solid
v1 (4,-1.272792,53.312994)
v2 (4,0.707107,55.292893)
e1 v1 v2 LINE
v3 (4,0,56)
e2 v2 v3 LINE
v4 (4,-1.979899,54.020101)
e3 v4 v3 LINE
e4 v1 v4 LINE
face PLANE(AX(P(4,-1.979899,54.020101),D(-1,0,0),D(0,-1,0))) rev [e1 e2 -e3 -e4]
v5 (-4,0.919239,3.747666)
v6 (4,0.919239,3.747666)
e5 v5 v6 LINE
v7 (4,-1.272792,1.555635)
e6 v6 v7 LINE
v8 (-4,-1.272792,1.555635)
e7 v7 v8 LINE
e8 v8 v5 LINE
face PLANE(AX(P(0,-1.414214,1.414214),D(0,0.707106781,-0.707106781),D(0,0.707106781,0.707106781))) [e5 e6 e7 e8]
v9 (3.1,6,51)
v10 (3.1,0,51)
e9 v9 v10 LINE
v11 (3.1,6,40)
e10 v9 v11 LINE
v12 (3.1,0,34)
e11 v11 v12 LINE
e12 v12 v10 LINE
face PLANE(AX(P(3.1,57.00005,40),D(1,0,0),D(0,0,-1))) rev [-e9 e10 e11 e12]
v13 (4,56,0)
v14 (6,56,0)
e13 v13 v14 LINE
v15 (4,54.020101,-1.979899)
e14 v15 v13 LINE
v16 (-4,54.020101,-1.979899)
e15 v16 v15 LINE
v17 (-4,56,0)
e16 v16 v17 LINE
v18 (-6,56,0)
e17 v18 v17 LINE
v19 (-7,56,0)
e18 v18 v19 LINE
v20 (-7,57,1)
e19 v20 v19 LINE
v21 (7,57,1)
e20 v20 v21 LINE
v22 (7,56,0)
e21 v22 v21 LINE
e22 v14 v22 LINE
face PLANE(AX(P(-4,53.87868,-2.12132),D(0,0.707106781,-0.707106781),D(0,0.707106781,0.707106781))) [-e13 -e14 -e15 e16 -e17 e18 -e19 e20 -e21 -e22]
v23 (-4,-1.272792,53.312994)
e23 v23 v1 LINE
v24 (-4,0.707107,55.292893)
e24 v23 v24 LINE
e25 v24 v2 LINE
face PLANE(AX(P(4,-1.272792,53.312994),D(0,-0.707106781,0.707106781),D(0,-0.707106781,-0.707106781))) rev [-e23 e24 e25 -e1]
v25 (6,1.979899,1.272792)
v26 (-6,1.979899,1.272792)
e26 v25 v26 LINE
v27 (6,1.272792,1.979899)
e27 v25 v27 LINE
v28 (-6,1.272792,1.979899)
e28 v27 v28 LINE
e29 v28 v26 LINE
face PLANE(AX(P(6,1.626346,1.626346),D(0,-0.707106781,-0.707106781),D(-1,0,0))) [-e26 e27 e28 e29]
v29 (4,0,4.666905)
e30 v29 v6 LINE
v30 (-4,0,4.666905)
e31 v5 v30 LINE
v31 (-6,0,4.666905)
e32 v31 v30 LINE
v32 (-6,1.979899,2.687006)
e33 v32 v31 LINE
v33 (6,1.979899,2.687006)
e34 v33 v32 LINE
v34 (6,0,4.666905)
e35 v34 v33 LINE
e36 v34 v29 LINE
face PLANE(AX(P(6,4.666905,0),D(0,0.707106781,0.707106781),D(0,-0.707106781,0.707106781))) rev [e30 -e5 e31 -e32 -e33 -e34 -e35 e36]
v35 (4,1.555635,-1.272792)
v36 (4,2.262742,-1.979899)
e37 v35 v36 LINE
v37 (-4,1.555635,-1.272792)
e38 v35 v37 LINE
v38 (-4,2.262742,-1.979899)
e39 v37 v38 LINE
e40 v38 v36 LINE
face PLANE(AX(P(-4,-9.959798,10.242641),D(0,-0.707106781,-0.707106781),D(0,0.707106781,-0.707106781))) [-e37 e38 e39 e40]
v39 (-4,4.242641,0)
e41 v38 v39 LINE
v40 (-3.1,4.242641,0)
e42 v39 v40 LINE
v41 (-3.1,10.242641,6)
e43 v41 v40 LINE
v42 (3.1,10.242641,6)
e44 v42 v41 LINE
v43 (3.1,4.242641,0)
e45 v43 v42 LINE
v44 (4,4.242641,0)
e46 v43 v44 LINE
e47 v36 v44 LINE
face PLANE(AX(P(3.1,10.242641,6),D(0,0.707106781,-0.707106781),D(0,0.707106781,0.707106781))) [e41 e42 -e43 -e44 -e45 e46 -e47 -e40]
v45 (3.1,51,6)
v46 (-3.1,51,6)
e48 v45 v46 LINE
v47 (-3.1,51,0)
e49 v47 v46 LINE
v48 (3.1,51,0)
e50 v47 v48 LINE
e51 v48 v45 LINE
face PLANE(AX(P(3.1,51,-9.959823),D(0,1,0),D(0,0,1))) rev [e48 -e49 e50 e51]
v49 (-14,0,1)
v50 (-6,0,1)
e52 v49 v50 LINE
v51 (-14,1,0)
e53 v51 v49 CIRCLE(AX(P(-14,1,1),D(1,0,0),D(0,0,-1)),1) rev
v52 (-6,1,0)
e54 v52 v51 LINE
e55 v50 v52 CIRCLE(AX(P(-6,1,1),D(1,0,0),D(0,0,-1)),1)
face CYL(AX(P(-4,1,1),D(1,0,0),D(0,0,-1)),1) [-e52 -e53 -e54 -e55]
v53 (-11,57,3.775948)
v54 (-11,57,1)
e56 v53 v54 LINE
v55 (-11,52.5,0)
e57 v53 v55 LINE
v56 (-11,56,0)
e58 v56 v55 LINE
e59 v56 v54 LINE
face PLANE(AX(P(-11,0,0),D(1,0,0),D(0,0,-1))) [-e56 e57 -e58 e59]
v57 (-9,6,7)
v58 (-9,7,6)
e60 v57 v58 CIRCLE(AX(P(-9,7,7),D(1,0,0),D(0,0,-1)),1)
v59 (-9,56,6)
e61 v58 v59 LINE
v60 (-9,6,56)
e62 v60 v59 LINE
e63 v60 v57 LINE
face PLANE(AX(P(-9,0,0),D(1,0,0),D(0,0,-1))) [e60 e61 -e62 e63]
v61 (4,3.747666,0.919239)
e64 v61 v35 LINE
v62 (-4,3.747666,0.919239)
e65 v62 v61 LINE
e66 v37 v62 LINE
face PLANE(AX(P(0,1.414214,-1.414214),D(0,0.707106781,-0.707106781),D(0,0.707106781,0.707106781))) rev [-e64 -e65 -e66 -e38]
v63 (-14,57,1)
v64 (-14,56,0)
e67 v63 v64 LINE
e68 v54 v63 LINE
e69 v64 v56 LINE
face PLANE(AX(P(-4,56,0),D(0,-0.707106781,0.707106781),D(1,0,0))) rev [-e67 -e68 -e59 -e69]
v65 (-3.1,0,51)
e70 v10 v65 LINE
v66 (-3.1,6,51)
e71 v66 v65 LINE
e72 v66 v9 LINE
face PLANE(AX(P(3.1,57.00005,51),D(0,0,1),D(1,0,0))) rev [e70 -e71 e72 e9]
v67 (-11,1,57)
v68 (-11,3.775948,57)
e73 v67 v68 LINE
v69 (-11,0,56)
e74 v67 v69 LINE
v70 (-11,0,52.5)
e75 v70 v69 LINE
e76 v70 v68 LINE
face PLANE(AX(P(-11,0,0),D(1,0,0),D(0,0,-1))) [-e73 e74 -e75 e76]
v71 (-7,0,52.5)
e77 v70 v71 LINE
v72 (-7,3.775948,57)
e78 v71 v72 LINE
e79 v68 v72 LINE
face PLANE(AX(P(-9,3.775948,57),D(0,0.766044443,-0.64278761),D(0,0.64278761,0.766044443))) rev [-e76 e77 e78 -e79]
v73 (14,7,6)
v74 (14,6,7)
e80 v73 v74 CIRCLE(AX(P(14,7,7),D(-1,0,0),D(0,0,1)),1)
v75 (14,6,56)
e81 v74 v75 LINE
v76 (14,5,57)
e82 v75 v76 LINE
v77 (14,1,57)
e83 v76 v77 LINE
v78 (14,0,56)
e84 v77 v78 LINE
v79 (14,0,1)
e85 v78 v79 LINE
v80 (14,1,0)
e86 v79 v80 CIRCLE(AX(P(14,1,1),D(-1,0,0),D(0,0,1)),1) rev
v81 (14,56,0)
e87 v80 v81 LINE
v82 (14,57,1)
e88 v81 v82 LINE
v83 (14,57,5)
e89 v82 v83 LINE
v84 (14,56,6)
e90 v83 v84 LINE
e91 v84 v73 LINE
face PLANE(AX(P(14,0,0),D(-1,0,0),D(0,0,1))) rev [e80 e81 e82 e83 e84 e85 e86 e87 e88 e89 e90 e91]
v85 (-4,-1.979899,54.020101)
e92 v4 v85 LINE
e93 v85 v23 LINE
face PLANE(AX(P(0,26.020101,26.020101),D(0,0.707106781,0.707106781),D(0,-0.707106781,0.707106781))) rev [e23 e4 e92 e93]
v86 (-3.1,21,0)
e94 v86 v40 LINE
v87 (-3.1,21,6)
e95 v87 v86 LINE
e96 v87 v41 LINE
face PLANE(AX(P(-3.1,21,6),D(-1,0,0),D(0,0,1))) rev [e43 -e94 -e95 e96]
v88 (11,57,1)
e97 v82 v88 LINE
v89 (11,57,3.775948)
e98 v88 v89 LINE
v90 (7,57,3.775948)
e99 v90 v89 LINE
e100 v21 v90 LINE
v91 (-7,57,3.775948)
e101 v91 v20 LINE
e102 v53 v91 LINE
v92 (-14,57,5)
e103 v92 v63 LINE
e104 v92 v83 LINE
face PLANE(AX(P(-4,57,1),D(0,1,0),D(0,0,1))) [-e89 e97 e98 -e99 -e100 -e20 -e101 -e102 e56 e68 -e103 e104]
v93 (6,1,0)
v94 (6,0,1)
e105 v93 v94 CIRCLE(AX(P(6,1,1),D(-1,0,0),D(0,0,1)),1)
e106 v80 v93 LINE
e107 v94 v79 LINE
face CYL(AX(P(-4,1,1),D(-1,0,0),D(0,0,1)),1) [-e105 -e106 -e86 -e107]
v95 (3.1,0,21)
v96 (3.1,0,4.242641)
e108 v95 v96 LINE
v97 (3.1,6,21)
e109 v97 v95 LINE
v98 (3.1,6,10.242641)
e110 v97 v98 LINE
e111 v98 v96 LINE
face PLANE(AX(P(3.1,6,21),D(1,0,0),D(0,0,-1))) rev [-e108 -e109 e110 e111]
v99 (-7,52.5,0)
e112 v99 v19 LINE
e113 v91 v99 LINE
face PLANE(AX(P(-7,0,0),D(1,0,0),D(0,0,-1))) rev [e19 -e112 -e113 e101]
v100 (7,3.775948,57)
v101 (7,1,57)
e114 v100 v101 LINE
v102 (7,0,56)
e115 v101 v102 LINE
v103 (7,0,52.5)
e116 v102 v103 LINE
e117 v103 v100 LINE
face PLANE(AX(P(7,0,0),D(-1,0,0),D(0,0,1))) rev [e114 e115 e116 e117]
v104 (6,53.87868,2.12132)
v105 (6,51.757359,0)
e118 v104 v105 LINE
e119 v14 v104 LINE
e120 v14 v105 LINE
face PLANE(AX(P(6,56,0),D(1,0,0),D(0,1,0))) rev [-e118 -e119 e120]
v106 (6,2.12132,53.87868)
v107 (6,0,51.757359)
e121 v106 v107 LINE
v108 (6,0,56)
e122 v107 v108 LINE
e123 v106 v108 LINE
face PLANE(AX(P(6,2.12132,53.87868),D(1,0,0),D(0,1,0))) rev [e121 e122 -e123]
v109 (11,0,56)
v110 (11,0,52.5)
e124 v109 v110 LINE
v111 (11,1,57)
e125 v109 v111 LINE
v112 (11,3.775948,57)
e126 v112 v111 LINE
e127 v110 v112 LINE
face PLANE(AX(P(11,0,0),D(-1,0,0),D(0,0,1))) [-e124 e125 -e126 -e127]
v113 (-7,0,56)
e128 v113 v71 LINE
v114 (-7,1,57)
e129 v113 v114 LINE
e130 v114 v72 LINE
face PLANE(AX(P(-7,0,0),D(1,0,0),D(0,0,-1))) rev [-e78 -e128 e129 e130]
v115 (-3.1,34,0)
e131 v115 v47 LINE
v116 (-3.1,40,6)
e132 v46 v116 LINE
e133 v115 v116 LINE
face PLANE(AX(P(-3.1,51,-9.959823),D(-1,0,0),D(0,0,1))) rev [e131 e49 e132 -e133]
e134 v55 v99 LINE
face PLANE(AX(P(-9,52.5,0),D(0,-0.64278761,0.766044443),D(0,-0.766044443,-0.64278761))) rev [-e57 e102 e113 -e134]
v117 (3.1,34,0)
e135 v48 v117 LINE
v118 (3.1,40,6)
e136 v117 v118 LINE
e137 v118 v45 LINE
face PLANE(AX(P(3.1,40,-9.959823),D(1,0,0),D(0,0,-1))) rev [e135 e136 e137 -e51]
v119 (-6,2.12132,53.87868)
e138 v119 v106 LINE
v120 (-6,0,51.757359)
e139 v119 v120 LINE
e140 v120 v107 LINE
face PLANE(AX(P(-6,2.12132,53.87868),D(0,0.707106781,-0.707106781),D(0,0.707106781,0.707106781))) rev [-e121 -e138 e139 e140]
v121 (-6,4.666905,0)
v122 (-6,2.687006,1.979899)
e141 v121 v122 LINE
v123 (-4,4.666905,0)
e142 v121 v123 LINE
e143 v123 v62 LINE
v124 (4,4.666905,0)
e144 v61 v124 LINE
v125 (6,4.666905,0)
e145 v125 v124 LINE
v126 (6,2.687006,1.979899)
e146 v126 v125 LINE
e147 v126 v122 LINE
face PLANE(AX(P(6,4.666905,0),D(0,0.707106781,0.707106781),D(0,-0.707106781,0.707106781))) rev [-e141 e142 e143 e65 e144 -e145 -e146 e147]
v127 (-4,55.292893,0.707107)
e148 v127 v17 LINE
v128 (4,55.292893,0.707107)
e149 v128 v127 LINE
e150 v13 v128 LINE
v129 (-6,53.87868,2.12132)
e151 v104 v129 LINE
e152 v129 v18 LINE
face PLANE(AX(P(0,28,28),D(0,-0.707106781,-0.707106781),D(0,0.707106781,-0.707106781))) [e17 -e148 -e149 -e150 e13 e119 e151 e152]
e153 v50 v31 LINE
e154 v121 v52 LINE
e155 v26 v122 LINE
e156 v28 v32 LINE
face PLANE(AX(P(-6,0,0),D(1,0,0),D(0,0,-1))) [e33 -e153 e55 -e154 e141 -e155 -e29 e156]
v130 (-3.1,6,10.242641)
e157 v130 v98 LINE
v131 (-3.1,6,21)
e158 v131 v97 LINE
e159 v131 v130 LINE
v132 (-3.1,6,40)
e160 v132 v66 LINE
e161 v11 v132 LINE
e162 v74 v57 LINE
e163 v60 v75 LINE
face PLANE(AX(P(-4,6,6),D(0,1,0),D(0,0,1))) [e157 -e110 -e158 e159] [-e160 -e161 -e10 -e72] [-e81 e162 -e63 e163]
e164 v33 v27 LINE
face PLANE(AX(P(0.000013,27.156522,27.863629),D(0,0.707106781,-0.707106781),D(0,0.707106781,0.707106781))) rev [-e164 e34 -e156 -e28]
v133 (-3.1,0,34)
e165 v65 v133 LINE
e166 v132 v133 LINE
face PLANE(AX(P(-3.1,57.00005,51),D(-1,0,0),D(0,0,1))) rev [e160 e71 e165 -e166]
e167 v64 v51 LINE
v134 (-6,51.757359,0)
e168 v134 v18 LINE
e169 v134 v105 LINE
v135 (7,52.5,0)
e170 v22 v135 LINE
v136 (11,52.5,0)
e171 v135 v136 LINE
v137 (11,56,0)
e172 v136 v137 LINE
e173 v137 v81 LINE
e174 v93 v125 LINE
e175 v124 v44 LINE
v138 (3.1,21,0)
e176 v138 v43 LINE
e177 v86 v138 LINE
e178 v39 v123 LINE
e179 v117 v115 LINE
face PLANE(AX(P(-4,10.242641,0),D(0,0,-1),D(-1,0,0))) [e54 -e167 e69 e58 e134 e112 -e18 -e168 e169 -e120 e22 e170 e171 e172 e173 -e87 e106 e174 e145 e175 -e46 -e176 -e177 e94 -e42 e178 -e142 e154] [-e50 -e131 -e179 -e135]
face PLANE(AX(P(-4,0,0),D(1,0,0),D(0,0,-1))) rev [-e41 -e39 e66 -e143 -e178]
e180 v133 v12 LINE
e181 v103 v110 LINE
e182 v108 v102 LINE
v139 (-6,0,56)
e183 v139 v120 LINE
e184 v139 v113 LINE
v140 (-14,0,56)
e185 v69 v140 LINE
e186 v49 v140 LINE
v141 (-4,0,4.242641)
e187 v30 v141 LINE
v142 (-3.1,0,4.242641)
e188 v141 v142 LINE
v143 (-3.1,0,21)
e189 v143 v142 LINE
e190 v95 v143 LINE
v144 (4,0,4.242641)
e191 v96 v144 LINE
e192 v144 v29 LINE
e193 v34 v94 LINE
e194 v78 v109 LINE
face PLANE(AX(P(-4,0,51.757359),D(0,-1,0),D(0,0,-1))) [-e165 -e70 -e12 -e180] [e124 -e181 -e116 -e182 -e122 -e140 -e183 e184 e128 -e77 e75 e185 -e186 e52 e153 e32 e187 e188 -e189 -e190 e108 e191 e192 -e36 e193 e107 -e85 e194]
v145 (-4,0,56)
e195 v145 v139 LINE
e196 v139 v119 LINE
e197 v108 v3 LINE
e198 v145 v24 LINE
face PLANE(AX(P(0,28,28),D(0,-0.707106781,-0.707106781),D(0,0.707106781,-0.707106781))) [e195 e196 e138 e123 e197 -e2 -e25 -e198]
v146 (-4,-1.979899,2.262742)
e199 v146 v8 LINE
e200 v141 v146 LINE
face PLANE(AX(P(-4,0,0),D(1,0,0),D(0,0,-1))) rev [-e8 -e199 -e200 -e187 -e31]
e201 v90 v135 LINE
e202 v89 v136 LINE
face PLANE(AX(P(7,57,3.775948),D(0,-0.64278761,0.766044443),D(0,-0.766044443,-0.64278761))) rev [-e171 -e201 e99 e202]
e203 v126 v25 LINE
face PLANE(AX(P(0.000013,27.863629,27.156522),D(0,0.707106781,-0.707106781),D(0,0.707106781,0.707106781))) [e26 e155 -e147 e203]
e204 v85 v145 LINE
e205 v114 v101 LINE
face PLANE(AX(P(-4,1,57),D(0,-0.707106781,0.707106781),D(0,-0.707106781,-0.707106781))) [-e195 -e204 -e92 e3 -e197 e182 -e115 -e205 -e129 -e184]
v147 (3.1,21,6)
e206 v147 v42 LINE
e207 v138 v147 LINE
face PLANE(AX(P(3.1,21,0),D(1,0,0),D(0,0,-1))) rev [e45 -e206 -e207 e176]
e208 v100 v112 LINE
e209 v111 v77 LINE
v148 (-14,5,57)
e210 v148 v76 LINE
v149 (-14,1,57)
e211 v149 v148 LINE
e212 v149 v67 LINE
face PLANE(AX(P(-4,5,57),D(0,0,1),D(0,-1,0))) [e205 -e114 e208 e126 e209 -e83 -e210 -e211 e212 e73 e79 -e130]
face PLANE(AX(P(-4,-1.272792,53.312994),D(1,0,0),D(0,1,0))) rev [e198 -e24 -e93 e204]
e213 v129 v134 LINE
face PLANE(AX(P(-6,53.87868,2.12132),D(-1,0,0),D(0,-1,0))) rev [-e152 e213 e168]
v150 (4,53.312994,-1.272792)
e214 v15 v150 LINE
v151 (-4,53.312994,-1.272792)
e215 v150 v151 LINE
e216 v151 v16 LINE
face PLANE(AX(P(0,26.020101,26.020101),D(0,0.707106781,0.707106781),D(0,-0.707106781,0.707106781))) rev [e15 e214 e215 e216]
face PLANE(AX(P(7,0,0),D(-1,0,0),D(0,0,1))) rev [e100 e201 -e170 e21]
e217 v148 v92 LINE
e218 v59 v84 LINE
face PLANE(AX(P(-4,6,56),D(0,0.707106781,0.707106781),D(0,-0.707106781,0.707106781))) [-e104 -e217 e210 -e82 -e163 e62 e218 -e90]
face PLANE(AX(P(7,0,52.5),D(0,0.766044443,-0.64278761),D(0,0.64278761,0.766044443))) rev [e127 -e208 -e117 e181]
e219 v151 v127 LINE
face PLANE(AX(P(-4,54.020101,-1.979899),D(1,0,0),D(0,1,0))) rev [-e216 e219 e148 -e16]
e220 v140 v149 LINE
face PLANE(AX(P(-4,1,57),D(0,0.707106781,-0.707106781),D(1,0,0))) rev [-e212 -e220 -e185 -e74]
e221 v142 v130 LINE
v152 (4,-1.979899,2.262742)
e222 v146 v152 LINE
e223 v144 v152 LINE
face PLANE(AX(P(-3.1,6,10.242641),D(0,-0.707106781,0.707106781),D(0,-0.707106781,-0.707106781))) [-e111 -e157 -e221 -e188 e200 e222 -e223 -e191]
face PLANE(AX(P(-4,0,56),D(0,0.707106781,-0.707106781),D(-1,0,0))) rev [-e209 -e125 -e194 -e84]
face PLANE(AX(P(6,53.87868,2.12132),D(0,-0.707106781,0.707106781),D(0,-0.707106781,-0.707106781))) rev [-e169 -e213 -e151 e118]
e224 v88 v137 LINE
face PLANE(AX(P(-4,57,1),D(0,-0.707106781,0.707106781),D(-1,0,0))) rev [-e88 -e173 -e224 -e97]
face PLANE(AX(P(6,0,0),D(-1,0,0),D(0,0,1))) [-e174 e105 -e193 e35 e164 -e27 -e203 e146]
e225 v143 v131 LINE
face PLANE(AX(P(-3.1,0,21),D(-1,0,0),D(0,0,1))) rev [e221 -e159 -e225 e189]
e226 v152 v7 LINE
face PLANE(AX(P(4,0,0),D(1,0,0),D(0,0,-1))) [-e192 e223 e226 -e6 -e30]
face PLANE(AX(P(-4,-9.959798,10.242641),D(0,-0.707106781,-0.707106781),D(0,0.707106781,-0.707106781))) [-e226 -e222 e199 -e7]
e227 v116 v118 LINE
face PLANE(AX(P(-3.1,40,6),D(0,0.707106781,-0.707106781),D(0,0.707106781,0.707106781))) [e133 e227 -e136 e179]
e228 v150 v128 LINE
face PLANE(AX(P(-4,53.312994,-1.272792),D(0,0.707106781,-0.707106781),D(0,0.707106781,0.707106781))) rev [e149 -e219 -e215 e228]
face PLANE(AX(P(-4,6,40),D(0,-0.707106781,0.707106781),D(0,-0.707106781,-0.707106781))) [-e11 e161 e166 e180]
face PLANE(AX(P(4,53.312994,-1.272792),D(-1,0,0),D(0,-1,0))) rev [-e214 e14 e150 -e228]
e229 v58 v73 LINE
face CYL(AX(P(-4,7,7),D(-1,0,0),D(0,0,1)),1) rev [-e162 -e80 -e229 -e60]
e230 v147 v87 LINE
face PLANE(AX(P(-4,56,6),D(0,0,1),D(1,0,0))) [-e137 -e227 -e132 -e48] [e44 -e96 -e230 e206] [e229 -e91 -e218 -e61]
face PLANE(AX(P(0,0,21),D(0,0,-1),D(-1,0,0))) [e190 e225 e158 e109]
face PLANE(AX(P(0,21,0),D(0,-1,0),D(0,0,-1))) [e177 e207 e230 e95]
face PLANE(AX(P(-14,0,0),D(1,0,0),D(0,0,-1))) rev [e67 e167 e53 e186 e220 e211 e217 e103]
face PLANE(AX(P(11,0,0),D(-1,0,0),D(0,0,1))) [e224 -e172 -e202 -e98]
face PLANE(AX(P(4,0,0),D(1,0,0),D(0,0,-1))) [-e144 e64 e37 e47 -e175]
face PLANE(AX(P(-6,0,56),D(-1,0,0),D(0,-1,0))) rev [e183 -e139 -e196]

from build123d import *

# Parameters (mm, degrees)
BOSS_EXTRUDE1_DEPTH  = 8
BOSS_EXTRUDE2_DEPTH  = 2
BOSS_EXTRUDE3_DEPTH  = 5
BOSS_EXTRUDE4_DEPTH  = 3
CUT_EXTRUDE1_DEPTH   = 4
CUT_EXTRUDE2_DEPTH   = 4
BOSS_EXTRUDE5_DEPTH  = 2
BOSS_EXTRUDE6_DEPTH  = 1
BOSS_EXTRUDE7_DEPTH  = 2
BOSS_EXTRUDE8_DEPTH  = 2
CUT_EXTRUDE3_DEPTH   = 1
CUT_EXTRUDE4_DEPTH   = 1
CUT_EXTRUDE5_DEPTH   = 1
CUT_EXTRUDE6_DEPTH   = 1
SKETCH15_W           = 8
SKETCH15_H           = 3.1
CUT_EXTRUDE7_DEPTH   = 4
SKETCH16_W           = 12
SKETCH16_H           = 3
CUT_EXTRUDE8_DEPTH   = 3
SKETCH17_W           = 12
SKETCH17_H           = 3
CUT_EXTRUDE9_DEPTH   = 3
SKETCH18_W           = 6.2
SKETCH18_H           = 6
CUT_EXTRUDE10_DEPTH  = 10.757359313
SKETCH19_W           = 6.2
SKETCH19_H           = 6
CUT_EXTRUDE11_DEPTH  = 10.757359313
BOSS_EXTRUDE9_DEPTH  = 3
SKETCH21_W           = 6.2
SKETCH21_H           = 11
CUT_EXTRUDE12_DEPTH  = 78.756028705
SKETCH22_W           = 6.2
SKETCH22_H           = 11
CUT_EXTRUDE13_DEPTH  = 82.816868676
SKETCH23_W           = 8
SKETCH23_H           = 1
BOSS_EXTRUDE10_DEPTH = 2.8
SKETCH24_W           = 8
SKETCH24_H           = 1
BOSS_EXTRUDE11_DEPTH = 2.8
DRAFT1_START         = -3.1
DRAFT1_DEPTH         = 6.2
DRAFT1_START_2       = -4
DRAFT1_2_DEPTH       = 8
DRAFT2_START         = -3.1
DRAFT2_DEPTH         = 6.2
DRAFT2_START_2       = -4
DRAFT2_2_DEPTH       = 8
RIB1_REACH           = 83.817
SKETCH25_WALL_W      = 177.633737352
SKETCH25_WALL_H      = 1
CHAMFER1_SIZE        = 1
FILLET1_R            = 1


# Read off the part's stored shape, not the designer's step: Draft1, Draft2
with BuildPart() as part:
    # Sketch1 → Boss-Extrude1 (new body)
    with BuildSketch(Plane(origin=(4, 0, 0), x_dir=(0, 0, -1), z_dir=(1, 0, 0))):
        Polygon((-51.757359313, 0), (-10.242640687, 0), (-10.242640687, -9.959797975), (9.959797975, 10.242640687), (0, 10.242640687), (0, 51.757359313), (2.121320344, 53.878679656), (-1, 57), (-5, 57), (-6, 56), (-6, 6), (-56, 6), (-57, 5), (-57, 1), (-53.878679656, -2.121320344), align=None)
    extrude(amount=-BOSS_EXTRUDE1_DEPTH)

    # Sketch2 → Boss-Extrude2 (add)
    with BuildSketch(Plane(origin=(4, 0, 0), x_dir=(0, 0, -1), z_dir=(1, 0, 0))):
        Polygon((0, 4.666904756), (-4.666904756, 0), (-51.757359313, 0), (-53.878679656, -2.121320344), (-57, 1), (-57, 5), (-56, 6), (-6, 6), (-6, 56), (-5, 57), (-1, 57), (2.121320344, 53.878679656), (0, 51.757359313), align=None)
    extrude(amount=BOSS_EXTRUDE2_DEPTH)

    # Sketch3 → Boss-Extrude3 (add)
    with BuildSketch(Plane(origin=(6, 0, 0), x_dir=(0, 0, -1), z_dir=(1, 0, 0))):
        Polygon((-51.757359313, 0), (-53.878679656, -2.121320344), (-57, 1), (-57, 5), (-56, 6), (-6, 6), (-6, 56), (-5, 57), (-1, 57), (2.121320344, 53.878679656), (0, 51.757359313), (0, 0), align=None)
    extrude(amount=BOSS_EXTRUDE3_DEPTH)

    # Sketch4 → Boss-Extrude4 (add)
    with BuildSketch(Plane(origin=(11, 0, 0), x_dir=(0, 0, -1), z_dir=(1, 0, 0))):
        Polygon((-5, 57), (0, 57), (0, 0), (-57, 0), (-57, 5), (-56, 6), (-6, 6), (-6, 56), align=None)
    extrude(amount=BOSS_EXTRUDE4_DEPTH)

    # Sketch5 → Cut-Extrude1 (cut)
    with BuildSketch(Plane(origin=(11, 0, 0), x_dir=(0, 0, -1), z_dir=(1, 0, 0))):
        Polygon((-1, 57), (-3.77594834, 57), (0, 52.5), (0, 51.757359313), (2.121320344, 53.878679656), align=None)
    extrude(amount=-CUT_EXTRUDE1_DEPTH, mode=Mode.SUBTRACT)

    # Sketch6 → Cut-Extrude2 (cut)
    with BuildSketch(Plane(origin=(11, 0, 0), x_dir=(0, 0, -1), z_dir=(1, 0, 0))):
        Polygon((-57, 3.77594834), (-57, 1), (-53.878679656, -2.121320344), (-51.757359313, 0), (-52.5, 0), align=None)
    extrude(amount=-CUT_EXTRUDE2_DEPTH, mode=Mode.SUBTRACT)

    # Sketch7 → Boss-Extrude5 (add)
    with BuildSketch(Plane.ZY.offset(4)):
        Polygon((51.757359313, 0), (4.666904756, 0), (0, 4.666904756), (0, 51.757359313), (-2.121320344, 53.878679656), (1, 57), (5, 57), (6, 56), (6, 6), (56, 6), (57, 5), (57, 1), (53.878679656, -2.121320344), align=None)
    extrude(amount=BOSS_EXTRUDE5_DEPTH)

    # Sketch8 → Boss-Extrude6 (add)
    with BuildSketch(Plane.ZY.offset(6)):
        Polygon((0, 51.757359313), (-2.121320344, 53.878679656), (1, 57), (5, 57), (6, 56), (6, 6), (56, 6), (57, 5), (57, 1), (53.878679656, -2.121320344), (51.757359313, 0), (0, 0), align=None)
    extrude(amount=BOSS_EXTRUDE6_DEPTH)

    # Sketch9 → Boss-Extrude7 (add)
    with BuildSketch(Plane.ZY.offset(7)):
        Polygon((5, 57), (6, 56), (6, 6), (56, 6), (57, 5), (57, 3.77594834), (52.5, 0), (0, 0), (0, 52.5), (3.77594834, 57), align=None)
    extrude(amount=BOSS_EXTRUDE7_DEPTH)

    # Sketch10 → Boss-Extrude8 (add)
    with BuildSketch(Plane.ZY.offset(9)):
        Polygon((0, 0), (0, 52.5), (3.77594834, 57), (5, 57), (57, 5), (57, 3.77594834), (52.5, 0), align=None)
    extrude(amount=BOSS_EXTRUDE8_DEPTH)

    # Sketch11 → Cut-Extrude3 (cut)
    with BuildSketch(Plane.ZY.offset(7)):
        Polygon((53.878679656, -2.121320344), (56, 0), (51.757359313, 0), align=None)
    extrude(amount=-CUT_EXTRUDE3_DEPTH, mode=Mode.SUBTRACT)

    # Sketch12 → Cut-Extrude4 (cut)
    with BuildSketch(Plane(origin=(7, 0, 0), x_dir=(0, 0, -1), z_dir=(1, 0, 0))):
        Polygon((-51.757359313, 0), (-56, 0), (-53.878679656, -2.121320344), align=None)
    extrude(amount=-CUT_EXTRUDE4_DEPTH, mode=Mode.SUBTRACT)

    # Sketch13 → Cut-Extrude5 (cut)
    with BuildSketch(Plane(origin=(7, 0, 0), x_dir=(0, 0, -1), z_dir=(1, 0, 0))):
        Polygon((0, 56), (0, 51.757359313), (2.121320344, 53.878679656), align=None)
    extrude(amount=-CUT_EXTRUDE5_DEPTH, mode=Mode.SUBTRACT)

    # Sketch14 → Cut-Extrude6 (cut)
    with BuildSketch(Plane.ZY.offset(7)):
        Polygon((-2.121320344, 53.878679656), (0, 51.757359313), (0, 56), align=None)
    extrude(amount=-CUT_EXTRUDE6_DEPTH, mode=Mode.SUBTRACT)

    # Sketch15 → Cut-Extrude7 (cut)
    with BuildSketch(Plane(origin=(0, 1.414213562, -1.414213562), x_dir=(-1, 0, 0), z_dir=(0, 0.7071067811865474, -0.7071067811865477))):
        with Locations((0, 1.75)):
            Rectangle(SKETCH15_W, SKETCH15_H)
    extrude(amount=-CUT_EXTRUDE7_DEPTH, mode=Mode.SUBTRACT)

    # Sketch16 → Cut-Extrude8 (cut)
    with BuildSketch(Plane(origin=(0, 25.878679656, 25.878679656), x_dir=(-1, 0, 0), z_dir=(0, -0.707106781186546, -0.7071067811865491))):
        with Locations((0, 38.097979746)):
            Rectangle(SKETCH16_W, SKETCH16_H)
    extrude(amount=-CUT_EXTRUDE8_DEPTH, mode=Mode.SUBTRACT)

    # Sketch17 → Cut-Extrude9 (cut)
    with BuildSketch(Plane(origin=(0, 25.878679656, 25.878679656), x_dir=(-1, 0, 0), z_dir=(0, -0.7071067811865469, -0.7071067811865481))):
        with Locations((0, -38.097979746)):
            Rectangle(SKETCH17_W, SKETCH17_H)
    extrude(amount=-CUT_EXTRUDE9_DEPTH, mode=Mode.SUBTRACT)

    # Sketch18 → Cut-Extrude10 (cut)
    with BuildSketch(Plane.XZ.offset(-10.242640687)):
        with Locations((0, 3)):
            Rectangle(SKETCH18_W, SKETCH18_H)
    extrude(amount=-CUT_EXTRUDE10_DEPTH, mode=Mode.SUBTRACT)

    # Sketch19 → Cut-Extrude11 (cut)
    with BuildSketch(Plane(origin=(0, 0, 10.242640687), x_dir=(-1, 0, 0), z_dir=(0, 0, -1))):
        with Locations((0, 3)):
            Rectangle(SKETCH19_W, SKETCH19_H)
    extrude(amount=-CUT_EXTRUDE11_DEPTH, mode=Mode.SUBTRACT)

    # Sketch20 → Boss-Extrude9 (add)
    with BuildSketch(Plane.ZY.offset(11)):
        Polygon((57, 0), (0, 0), (0, 57), (5, 57), (57, 5), align=None)
    extrude(amount=BOSS_EXTRUDE9_DEPTH)

    # Sketch21 → Cut-Extrude12 (cut, through all)
    with BuildSketch(Plane.XY.offset(6)):
        with Locations((0, 45.5)):
            Rectangle(SKETCH21_W, SKETCH21_H)
    extrude(amount=-CUT_EXTRUDE12_DEPTH, mode=Mode.SUBTRACT)

    # Sketch22 → Cut-Extrude13 (cut, through all)
    with BuildSketch(Plane.XZ):
        with Locations((0, 45.5)):
            Rectangle(SKETCH22_W, SKETCH22_H)
    extrude(amount=-CUT_EXTRUDE13_DEPTH, mode=Mode.SUBTRACT)

    # Sketch23 → Boss-Extrude10 (add)
    with BuildSketch(Plane(origin=(0, 28, 28), x_dir=(-1, 0, 0), z_dir=(0, -0.7071067811865448, -0.7071067811865503))):
        with Locations((0, 39.097979746)):
            Rectangle(SKETCH23_W, SKETCH23_H)
    extrude(amount=BOSS_EXTRUDE10_DEPTH)

    # Sketch24 → Boss-Extrude11 (add)
    with BuildSketch(Plane(origin=(0, 28, 28), x_dir=(-1, 0, 0), z_dir=(0, -0.7071067811865471, -0.7071067811865479))):
        with Locations((0, -39.097979746)):
            Rectangle(SKETCH24_W, SKETCH24_H)
    extrude(amount=BOSS_EXTRUDE11_DEPTH)

    # Draft1 outline → Draft1 (cut)
    with BuildSketch(Plane.YZ.offset(DRAFT1_START)):
        Polygon((0, 40), (0, 34), (6, 40), align=None)
        Polygon((6, 10.242640687), (-9.959797975, 10.242640687), (-1.979898987, 2.2627417), align=None)
    extrude(amount=DRAFT1_DEPTH, mode=Mode.SUBTRACT)

    # Draft1 2 outline → Draft1 2 (cut)
    with BuildSketch(Plane.YZ.offset(DRAFT1_START_2)):
        Polygon((-1.979898987, 2.2627417), (0, 4.242640687), (0, 10.242640687), (-9.959797975, 10.242640687), align=None)
    extrude(amount=DRAFT1_2_DEPTH, mode=Mode.SUBTRACT)

    # Draft2 outline → Draft2 (cut)
    with BuildSketch(Plane.YZ.offset(DRAFT2_START)):
        Polygon((40, 6), (34, 0), (40, 0), align=None)
        Polygon((2.2627417, -1.979898987), (10.242640687, -9.959797975), (10.242640687, 6), align=None)
    extrude(amount=DRAFT2_DEPTH, mode=Mode.SUBTRACT)

    # Draft2 2 outline → Draft2 2 (cut)
    with BuildSketch(Plane.YZ.offset(DRAFT2_START_2)):
        Polygon((4.242640687, 0), (2.2627417, -1.979898987), (10.242640687, -9.959797975), (10.242640687, 0), align=None)
    extrude(amount=DRAFT2_2_DEPTH, mode=Mode.SUBTRACT)

    # Sketch25 wall → Rib1 (add, up to next)
    with BuildSketch(Plane(origin=(0, 1.626345597, 1.626345597), x_dir=(-1, 0, 0), z_dir=(0, 0.707106781187, 0.707106781187)), mode=Mode.PRIVATE) as rib1_sk1:
        Rectangle(SKETCH25_WALL_W, SKETCH25_WALL_H)
    rib1_tool1 = extrude(rib1_sk1.sketch, amount=RIB1_REACH, mode=Mode.PRIVATE) - part.part
    add(rib1_tool1.solids().sort_by_distance((0, 1.626345597, 1.626345597))[0])

    # Chamfer1
    chamfer1_edges = [part.edges().sort_by_distance(p)[0] for p in [
        (12.5, 57, 0),
        (-12.5, 57, 0),
        (-12.5, 0, 57),
        (12.5, 0, 57),
    ]]
    chamfer(chamfer1_edges, length=CHAMFER1_SIZE)

    # Fillet1
    fillet1_edges = [part.edges().sort_by_distance(p)[0] for p in [
        (2.5, 6, 6),
        (-10, 0, 0),
        (10, 0, 0),
    ]]
    fillet(fillet1_edges, radius=FILLET1_R)


solid = part.part
